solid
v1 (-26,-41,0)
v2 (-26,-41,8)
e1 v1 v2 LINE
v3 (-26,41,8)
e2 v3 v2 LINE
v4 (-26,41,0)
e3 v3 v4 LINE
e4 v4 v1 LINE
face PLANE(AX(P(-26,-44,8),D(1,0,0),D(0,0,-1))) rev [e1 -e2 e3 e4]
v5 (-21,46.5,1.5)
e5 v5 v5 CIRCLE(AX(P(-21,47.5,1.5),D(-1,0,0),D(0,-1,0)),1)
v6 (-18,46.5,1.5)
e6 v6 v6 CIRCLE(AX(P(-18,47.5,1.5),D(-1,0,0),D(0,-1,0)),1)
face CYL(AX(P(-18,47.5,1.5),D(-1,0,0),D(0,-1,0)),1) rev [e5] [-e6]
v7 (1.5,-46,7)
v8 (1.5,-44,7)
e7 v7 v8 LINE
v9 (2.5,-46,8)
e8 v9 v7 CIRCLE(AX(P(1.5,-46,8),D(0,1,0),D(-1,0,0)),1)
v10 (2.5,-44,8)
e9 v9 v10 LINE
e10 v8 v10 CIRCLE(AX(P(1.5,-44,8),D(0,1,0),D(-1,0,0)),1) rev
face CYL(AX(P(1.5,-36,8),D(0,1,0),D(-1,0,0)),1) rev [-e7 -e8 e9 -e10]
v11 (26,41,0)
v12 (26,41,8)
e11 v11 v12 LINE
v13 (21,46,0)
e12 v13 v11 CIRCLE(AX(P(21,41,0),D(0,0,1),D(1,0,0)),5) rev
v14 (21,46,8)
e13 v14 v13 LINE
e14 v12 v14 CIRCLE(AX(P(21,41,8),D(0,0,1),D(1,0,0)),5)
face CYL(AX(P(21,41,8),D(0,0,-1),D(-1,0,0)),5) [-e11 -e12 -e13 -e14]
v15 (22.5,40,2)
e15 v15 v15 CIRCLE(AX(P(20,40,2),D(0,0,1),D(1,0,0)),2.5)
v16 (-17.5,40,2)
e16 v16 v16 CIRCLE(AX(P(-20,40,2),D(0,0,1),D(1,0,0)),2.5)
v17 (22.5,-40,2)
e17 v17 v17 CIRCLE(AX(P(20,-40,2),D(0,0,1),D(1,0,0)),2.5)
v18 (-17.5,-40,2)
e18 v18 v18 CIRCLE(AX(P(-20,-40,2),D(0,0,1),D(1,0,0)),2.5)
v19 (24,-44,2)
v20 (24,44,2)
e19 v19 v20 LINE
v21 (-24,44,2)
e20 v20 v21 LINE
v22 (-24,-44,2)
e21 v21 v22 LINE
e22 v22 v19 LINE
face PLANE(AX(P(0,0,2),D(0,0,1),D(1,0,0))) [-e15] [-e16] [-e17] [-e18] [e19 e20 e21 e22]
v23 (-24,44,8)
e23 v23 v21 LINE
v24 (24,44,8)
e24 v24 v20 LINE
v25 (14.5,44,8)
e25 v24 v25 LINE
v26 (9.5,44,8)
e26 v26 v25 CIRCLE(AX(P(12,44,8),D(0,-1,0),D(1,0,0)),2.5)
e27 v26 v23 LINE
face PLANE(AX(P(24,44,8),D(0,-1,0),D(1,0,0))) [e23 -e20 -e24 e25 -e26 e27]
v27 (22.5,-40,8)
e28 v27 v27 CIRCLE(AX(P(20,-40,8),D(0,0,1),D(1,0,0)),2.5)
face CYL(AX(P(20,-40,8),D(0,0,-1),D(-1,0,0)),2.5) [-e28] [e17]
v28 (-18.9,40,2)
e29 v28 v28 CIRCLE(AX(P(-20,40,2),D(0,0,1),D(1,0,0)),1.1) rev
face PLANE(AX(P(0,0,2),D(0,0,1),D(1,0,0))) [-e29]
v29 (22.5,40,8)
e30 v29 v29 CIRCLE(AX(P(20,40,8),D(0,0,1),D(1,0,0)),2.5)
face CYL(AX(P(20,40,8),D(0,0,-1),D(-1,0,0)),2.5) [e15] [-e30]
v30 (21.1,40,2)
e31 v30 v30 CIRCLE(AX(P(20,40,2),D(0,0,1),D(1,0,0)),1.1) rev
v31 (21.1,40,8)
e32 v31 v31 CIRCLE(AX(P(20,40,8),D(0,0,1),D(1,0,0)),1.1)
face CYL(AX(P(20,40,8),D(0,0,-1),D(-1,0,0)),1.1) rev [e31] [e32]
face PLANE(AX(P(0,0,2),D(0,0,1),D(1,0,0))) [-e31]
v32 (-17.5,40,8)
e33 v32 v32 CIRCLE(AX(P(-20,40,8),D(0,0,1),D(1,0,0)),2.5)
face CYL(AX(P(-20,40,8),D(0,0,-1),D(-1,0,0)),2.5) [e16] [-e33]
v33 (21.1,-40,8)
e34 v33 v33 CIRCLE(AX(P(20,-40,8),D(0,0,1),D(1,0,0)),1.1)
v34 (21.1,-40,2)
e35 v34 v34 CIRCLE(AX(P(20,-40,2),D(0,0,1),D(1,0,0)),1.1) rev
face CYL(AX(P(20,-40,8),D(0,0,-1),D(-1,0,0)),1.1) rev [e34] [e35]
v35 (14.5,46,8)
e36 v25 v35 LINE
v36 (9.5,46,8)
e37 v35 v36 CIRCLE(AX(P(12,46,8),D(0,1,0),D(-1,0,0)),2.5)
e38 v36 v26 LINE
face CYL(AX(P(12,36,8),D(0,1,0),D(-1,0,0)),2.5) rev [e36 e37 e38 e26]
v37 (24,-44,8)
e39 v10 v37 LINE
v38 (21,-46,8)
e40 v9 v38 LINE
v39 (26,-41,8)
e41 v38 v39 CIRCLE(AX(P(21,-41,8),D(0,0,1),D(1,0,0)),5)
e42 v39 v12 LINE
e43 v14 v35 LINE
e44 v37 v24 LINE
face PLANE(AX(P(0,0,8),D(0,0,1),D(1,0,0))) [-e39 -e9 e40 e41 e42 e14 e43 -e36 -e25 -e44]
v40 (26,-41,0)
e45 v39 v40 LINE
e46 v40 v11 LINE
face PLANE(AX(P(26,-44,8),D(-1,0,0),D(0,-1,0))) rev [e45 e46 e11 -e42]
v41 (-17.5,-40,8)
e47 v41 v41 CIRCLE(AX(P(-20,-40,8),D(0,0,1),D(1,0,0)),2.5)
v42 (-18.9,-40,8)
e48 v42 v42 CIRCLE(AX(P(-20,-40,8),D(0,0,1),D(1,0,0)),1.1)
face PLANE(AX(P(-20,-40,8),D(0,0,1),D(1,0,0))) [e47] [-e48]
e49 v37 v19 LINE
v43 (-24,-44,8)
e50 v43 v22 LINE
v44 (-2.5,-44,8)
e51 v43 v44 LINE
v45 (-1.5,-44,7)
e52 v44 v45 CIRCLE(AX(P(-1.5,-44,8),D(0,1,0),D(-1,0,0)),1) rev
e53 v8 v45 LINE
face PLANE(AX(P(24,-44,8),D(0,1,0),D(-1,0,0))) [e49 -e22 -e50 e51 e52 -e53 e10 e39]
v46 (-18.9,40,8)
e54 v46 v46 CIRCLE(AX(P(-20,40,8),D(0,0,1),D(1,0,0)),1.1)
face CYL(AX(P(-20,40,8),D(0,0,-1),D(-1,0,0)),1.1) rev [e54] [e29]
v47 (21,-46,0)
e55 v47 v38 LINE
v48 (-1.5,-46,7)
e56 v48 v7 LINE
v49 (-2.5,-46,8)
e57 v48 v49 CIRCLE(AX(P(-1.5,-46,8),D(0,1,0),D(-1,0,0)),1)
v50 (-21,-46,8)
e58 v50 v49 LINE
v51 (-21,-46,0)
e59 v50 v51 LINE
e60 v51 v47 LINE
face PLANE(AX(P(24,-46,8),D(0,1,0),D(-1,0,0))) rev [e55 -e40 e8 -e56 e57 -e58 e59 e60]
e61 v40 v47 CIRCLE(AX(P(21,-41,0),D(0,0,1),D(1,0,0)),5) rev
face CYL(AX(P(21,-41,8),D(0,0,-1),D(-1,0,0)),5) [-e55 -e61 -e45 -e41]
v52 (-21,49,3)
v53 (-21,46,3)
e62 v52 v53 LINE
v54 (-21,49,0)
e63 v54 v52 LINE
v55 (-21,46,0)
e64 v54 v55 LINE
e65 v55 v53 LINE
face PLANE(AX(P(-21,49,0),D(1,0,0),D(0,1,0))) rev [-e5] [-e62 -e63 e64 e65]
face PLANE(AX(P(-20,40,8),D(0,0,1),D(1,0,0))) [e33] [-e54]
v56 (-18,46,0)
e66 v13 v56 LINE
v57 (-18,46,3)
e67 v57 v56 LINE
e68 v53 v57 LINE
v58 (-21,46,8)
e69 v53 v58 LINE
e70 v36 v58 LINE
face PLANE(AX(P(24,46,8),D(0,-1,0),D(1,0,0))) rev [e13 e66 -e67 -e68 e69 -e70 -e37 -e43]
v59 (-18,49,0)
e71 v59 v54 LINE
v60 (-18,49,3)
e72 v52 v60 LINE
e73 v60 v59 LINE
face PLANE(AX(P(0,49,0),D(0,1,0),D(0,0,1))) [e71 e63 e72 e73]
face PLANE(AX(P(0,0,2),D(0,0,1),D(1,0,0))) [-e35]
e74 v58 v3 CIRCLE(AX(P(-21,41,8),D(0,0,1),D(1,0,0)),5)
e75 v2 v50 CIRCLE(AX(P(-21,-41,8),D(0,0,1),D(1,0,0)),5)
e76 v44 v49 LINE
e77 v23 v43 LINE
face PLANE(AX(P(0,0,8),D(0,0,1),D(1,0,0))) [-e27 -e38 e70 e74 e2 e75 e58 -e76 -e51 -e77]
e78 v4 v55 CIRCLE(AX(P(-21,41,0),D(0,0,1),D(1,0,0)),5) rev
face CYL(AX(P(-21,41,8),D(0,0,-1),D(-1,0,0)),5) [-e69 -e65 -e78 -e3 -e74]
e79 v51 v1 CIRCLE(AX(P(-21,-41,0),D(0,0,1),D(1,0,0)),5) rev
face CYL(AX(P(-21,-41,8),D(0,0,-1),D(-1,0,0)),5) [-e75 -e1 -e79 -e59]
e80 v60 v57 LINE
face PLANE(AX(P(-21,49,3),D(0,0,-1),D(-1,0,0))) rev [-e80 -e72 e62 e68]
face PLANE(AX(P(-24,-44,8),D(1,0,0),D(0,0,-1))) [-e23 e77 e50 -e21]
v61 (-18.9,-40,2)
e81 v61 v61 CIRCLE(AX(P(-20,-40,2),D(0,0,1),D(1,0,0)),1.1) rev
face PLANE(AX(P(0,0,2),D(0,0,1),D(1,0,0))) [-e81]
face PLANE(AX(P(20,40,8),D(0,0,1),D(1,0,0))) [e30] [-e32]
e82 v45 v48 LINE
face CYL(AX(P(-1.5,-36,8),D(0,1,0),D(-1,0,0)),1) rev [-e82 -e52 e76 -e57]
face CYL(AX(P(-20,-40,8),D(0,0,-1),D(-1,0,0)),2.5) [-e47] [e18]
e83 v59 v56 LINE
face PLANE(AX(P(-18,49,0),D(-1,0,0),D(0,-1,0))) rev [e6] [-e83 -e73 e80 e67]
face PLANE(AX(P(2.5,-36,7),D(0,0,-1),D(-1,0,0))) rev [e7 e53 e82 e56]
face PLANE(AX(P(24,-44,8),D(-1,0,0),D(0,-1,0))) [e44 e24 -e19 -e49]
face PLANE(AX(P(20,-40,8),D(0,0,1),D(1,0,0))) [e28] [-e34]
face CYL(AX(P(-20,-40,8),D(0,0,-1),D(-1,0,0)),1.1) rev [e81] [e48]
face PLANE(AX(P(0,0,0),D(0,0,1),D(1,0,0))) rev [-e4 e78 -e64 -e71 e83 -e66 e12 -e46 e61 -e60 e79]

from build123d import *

# Parameters (mm, degrees)
SKETCH1_W           = 52
SKETCH1_H           = 92
SKETCH1_W_2         = 48
SKETCH1_H_2         = 88
EXTRUDE_THIN1_DEPTH = 8
SKETCH2_W           = 48
SKETCH2_H           = 88
BOSS_EXTRUDE1_DEPTH = 2
FILLET1_R           = 5
SKETCH3_R           = 2.5
SKETCH3_R_2         = 1.1
BOSS_EXTRUDE2_DEPTH = 6
SKETCH4_R           = 2.5
CUT_EXTRUDE1_DEPTH  = 10
SKETCH5_W           = 5
SKETCH5_H           = 2
CUT_EXTRUDE2_DEPTH  = 10
FILLET2_R           = 1
SKETCH6_W           = 3
SKETCH6_H           = 3
BOSS_EXTRUDE3_DEPTH = 3
SKETCH7_R           = 1
CUT_EXTRUDE3_DEPTH  = 3


with BuildPart() as part:
    # Sketch1 → Extrude-Thin1 (new body)
    with BuildSketch(Plane.XY):
        Rectangle(SKETCH1_W, SKETCH1_H)
        Rectangle(SKETCH1_W_2, SKETCH1_H_2, mode=Mode.SUBTRACT)
    extrude(amount=EXTRUDE_THIN1_DEPTH)

    # Sketch2 → Boss-Extrude1 (add)
    with BuildSketch(Plane.XY):
        Rectangle(SKETCH2_W, SKETCH2_H)
    extrude(amount=BOSS_EXTRUDE1_DEPTH)

    # Fillet1
    fillet1_edges = [part.edges().sort_by_distance(p)[0] for p in [
        (-26, 46, 4),
        (26, 46, 4),
        (26, -46, 4),
        (-26, -46, 4),
    ]]
    fillet(fillet1_edges, radius=FILLET1_R)

    # Sketch3 → Boss-Extrude2 (add)
    # profile 1 of 4: a face of its own
    with BuildSketch(Plane.XY.offset(2)):
        with Locations((-20, 40)):
            Circle(SKETCH3_R)
        with Locations((-20, 40)):
            Circle(SKETCH3_R_2, mode=Mode.SUBTRACT)
    # profile 2 of 4: a face of its own
    with BuildSketch(Plane.XY.offset(2)):
        with Locations((-20, -40)):
            Circle(SKETCH3_R)
        with Locations((-20, -40)):
            Circle(SKETCH3_R_2, mode=Mode.SUBTRACT)
    # profile 3 of 4: a face of its own
    with BuildSketch(Plane.XY.offset(2)):
        with Locations((20, -40)):
            Circle(SKETCH3_R)
        with Locations((20, -40)):
            Circle(SKETCH3_R_2, mode=Mode.SUBTRACT)
    # profile 4 of 4: a face of its own
    with BuildSketch(Plane.XY.offset(2)):
        with Locations((20, 40)):
            Circle(SKETCH3_R)
        with Locations((20, 40)):
            Circle(SKETCH3_R_2, mode=Mode.SUBTRACT)
    extrude(amount=BOSS_EXTRUDE2_DEPTH)

    # Sketch4 → Cut-Extrude1 (cut)
    with BuildSketch(Plane(origin=(0, 46, 0), x_dir=(1, 0, 0), z_dir=(0, 1, 0))):
        with Locations((12, -8)):
            Circle(SKETCH4_R)
    extrude(amount=-CUT_EXTRUDE1_DEPTH, mode=Mode.SUBTRACT)

    # Sketch5 → Cut-Extrude2 (cut)
    with BuildSketch(Plane.XZ.offset(46)):
        with Locations((0, 8)):
            Rectangle(SKETCH5_W, SKETCH5_H)
    extrude(amount=-CUT_EXTRUDE2_DEPTH, mode=Mode.SUBTRACT)

    # Fillet2
    fillet2_edges = [part.edges().sort_by_distance(p)[0] for p in [
        (-2.5, -45, 7),
        (2.5, -45, 7),
    ]]
    fillet(fillet2_edges, radius=FILLET2_R - 0.0001)  # a hair under: the kernel refuses the full size

    # Sketch6 → Boss-Extrude3 (add)
    with BuildSketch(Plane(origin=(0, 46, 0), x_dir=(1, 0, 0), z_dir=(0, 1, 0))):
        with Locations((-19.5, -1.5)):
            Rectangle(SKETCH6_W, SKETCH6_H)
    extrude(amount=BOSS_EXTRUDE3_DEPTH)

    # Sketch7 → Cut-Extrude3 (cut)
    with BuildSketch(Plane.ZY.offset(21)):
        with Locations(Location((1.5, 47.5, 0), (0, 0, 270))):
            Circle(SKETCH7_R)
    extrude(amount=-CUT_EXTRUDE3_DEPTH, mode=Mode.SUBTRACT)


solid = part.part
